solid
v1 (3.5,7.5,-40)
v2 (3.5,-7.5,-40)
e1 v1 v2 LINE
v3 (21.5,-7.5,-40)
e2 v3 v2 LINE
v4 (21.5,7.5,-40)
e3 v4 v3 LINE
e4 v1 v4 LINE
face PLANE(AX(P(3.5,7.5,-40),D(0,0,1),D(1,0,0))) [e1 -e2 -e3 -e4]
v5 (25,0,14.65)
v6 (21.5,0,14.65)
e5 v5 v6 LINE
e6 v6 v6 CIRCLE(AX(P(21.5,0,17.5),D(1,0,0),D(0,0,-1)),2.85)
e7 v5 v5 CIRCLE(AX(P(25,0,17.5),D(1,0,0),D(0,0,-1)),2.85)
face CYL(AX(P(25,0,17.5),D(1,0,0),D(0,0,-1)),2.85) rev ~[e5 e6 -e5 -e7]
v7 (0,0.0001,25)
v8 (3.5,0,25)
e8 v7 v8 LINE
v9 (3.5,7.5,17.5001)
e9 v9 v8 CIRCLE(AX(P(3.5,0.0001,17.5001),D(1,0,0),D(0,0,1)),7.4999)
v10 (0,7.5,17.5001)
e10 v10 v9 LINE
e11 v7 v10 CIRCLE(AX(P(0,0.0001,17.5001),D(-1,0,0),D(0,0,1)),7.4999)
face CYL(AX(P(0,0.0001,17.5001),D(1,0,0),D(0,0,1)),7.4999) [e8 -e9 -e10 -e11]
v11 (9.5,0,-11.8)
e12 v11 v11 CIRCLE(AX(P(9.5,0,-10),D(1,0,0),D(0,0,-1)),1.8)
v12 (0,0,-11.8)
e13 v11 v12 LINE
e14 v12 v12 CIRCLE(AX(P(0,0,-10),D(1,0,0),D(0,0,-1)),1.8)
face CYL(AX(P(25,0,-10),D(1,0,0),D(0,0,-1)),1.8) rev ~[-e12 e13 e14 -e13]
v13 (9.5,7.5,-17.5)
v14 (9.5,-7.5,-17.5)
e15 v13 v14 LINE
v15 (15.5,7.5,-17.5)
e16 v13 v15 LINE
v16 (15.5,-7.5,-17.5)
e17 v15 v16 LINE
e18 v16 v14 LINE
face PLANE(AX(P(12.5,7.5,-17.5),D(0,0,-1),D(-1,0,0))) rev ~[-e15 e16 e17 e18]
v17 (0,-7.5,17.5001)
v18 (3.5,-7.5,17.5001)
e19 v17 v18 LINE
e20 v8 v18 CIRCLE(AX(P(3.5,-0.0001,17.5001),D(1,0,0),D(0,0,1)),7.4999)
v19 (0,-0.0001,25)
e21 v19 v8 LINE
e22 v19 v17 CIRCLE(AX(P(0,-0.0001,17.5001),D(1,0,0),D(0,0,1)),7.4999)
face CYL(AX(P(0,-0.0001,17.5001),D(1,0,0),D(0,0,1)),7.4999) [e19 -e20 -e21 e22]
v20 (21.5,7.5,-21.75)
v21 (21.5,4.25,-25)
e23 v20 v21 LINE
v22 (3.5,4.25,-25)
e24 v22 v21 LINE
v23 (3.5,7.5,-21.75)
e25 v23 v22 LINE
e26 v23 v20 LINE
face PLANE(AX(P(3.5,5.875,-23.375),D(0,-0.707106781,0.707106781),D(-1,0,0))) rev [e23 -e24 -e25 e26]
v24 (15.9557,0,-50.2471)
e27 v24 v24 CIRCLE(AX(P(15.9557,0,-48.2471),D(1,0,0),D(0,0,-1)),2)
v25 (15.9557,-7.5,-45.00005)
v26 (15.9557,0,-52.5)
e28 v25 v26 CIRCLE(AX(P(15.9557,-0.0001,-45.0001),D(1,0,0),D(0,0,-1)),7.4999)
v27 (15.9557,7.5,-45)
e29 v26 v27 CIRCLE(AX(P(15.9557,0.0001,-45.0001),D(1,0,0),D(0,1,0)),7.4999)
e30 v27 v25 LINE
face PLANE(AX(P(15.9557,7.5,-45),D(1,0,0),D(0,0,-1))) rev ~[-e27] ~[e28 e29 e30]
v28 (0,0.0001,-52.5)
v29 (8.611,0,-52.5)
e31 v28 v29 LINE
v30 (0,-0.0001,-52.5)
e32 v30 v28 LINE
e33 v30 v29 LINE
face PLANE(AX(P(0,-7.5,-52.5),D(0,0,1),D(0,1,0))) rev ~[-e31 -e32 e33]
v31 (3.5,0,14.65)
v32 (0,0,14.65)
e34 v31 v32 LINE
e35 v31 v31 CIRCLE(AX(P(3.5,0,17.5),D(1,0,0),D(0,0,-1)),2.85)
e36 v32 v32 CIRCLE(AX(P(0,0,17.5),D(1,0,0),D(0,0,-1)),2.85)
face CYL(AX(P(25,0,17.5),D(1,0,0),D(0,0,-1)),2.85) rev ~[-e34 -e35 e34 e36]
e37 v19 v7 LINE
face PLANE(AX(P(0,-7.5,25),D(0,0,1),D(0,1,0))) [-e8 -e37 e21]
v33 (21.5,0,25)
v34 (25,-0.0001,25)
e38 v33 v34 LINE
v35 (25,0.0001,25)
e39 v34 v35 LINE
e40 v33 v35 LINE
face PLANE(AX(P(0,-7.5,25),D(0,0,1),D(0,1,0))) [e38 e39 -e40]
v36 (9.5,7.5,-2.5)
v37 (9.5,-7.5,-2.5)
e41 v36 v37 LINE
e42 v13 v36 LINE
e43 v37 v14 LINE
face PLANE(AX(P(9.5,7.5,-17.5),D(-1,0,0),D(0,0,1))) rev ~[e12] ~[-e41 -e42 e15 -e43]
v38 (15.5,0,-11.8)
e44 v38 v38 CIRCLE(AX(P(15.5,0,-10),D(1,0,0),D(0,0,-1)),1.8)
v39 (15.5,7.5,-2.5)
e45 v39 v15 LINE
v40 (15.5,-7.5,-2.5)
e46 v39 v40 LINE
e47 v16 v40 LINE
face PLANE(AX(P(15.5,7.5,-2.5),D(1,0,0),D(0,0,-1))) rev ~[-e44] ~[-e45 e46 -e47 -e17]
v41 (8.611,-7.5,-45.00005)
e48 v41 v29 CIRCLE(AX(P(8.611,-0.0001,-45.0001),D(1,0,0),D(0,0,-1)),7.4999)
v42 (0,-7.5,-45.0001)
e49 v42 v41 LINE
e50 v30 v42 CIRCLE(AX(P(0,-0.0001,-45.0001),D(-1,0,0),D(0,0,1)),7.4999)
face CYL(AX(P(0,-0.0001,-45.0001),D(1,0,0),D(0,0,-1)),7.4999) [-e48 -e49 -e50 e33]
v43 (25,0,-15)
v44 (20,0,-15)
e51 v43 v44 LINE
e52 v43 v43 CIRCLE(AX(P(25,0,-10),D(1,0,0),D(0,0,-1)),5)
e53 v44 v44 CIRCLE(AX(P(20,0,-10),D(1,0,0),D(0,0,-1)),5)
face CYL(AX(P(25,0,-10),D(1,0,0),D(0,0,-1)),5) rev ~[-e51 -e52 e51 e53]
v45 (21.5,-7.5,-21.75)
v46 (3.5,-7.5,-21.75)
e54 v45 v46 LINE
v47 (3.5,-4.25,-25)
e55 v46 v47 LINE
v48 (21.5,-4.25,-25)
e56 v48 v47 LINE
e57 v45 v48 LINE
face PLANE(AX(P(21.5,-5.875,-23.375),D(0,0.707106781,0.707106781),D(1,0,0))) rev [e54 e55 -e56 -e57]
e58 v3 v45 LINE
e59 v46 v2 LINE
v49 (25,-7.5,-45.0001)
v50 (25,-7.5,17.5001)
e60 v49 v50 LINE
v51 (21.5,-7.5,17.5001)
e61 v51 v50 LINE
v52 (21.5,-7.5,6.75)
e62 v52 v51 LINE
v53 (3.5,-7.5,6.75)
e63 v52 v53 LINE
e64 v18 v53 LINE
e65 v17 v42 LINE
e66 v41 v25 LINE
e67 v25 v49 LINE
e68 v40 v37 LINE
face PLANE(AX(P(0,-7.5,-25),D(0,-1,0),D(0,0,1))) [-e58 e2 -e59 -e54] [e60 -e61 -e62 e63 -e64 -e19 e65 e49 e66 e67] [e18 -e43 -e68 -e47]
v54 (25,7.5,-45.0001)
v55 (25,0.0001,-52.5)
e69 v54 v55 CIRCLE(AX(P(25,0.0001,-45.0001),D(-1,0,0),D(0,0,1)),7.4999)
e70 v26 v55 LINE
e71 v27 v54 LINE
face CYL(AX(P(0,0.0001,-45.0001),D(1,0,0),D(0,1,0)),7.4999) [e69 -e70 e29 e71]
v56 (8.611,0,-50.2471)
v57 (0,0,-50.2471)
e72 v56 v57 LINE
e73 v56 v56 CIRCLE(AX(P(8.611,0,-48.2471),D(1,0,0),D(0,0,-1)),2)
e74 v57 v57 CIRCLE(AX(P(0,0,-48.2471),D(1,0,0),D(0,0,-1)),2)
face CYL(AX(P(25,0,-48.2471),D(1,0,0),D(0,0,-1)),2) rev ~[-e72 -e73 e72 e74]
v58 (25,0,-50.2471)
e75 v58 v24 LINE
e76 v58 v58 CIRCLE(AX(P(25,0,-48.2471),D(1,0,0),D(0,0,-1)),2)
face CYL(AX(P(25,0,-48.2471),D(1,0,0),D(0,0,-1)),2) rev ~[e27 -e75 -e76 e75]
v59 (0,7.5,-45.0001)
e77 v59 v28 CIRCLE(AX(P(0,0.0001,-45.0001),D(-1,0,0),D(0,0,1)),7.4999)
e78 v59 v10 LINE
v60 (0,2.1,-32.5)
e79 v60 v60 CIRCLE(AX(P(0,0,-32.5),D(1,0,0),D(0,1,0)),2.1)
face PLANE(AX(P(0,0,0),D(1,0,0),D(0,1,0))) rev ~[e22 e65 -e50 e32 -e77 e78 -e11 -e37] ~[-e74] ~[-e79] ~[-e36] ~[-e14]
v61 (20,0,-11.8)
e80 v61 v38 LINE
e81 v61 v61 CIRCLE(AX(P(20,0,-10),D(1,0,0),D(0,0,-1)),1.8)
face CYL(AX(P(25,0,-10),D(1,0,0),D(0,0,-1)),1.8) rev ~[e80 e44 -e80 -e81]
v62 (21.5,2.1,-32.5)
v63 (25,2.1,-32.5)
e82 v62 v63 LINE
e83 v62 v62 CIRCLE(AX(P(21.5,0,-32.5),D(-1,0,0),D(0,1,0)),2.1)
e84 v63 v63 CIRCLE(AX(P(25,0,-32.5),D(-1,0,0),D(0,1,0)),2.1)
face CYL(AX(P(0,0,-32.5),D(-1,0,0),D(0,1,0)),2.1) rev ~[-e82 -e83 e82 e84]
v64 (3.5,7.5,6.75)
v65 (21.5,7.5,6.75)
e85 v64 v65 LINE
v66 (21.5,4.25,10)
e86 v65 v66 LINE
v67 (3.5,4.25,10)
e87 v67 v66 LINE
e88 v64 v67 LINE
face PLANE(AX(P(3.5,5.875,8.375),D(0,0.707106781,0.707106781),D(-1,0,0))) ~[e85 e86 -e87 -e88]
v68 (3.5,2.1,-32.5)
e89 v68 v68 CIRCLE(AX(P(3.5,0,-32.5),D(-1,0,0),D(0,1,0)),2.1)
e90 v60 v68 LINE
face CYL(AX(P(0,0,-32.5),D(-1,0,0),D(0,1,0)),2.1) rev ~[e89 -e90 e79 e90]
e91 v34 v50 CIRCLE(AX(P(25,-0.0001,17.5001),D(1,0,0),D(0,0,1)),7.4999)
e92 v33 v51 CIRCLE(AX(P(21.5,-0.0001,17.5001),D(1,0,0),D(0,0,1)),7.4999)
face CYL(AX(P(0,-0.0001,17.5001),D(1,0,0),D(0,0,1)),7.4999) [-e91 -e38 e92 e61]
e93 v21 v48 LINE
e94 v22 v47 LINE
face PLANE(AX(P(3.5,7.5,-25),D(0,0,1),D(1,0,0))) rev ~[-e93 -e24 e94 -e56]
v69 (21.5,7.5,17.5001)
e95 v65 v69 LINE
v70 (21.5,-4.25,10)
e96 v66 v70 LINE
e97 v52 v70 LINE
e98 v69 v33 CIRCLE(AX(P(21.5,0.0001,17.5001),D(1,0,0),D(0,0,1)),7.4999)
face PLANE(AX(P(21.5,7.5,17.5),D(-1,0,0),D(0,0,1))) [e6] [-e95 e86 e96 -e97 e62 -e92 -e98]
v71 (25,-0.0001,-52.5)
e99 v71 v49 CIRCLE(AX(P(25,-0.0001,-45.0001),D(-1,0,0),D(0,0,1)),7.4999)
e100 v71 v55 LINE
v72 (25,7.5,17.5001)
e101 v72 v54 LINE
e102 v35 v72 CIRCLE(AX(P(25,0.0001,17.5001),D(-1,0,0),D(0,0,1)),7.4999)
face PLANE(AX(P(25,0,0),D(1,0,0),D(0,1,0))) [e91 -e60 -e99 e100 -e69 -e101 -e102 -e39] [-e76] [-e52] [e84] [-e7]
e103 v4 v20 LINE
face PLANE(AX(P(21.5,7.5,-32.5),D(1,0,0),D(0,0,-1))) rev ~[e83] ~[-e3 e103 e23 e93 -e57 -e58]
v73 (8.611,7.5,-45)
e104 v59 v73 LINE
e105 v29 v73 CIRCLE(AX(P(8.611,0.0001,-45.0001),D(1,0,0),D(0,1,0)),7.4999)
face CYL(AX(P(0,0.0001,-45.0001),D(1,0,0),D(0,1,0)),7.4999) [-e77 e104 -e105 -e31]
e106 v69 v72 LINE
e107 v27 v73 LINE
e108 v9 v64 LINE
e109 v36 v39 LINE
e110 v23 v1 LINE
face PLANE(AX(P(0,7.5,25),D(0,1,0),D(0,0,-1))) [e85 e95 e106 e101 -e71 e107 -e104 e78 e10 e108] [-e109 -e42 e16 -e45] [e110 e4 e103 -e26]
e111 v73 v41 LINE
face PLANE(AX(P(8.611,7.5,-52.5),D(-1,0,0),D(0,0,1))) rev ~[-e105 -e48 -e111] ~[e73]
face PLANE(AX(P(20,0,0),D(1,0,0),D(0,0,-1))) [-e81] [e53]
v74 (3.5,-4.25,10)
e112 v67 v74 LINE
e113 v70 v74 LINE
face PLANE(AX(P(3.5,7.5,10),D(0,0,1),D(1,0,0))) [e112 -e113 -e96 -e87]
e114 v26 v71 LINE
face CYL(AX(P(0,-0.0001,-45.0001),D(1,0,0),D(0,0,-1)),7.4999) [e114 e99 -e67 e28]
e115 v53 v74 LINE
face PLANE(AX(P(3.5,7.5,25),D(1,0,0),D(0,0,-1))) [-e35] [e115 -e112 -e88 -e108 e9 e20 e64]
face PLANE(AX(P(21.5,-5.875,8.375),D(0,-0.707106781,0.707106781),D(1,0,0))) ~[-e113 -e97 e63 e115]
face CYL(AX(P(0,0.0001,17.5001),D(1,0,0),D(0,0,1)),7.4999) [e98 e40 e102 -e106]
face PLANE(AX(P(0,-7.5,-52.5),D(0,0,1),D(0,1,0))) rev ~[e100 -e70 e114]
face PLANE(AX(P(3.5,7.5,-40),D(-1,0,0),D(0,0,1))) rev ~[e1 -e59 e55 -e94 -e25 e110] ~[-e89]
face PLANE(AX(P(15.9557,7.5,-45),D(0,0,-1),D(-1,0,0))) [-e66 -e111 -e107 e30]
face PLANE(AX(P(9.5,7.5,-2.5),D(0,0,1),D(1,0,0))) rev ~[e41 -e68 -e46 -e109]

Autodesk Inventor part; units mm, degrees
ref_plane "YZ Plane" through (0, 0, 0) normal (1, 0, 0) x (0, 1, 0)
ref_plane "XZ Plane" through (0, 0, 0) normal (0, 1, 0) x (-1, 0, 0)
ref_plane "XY Plane" through (0, 0, 0) normal (0, 0, 1) x (1, 0, 0)
sketch "Эскиз1" plane through (0, 0, 0) normal (1, 0, 0) x (0, 1, 0)
  line L0 (-7.5, 25) -> (7.5, 25)
  line L1 (7.5, 25) -> (7.5, -25)
  line L2 (7.5, -25) -> (-7.5, -25)
  line L3 (-7.5, -25) -> (-7.5, 25)
  line L4 (-7.5, 25) -> (7.5, -25) construction
  line L5 (7.5, 25) -> (-7.5, -25) construction
  line L6 (0, -25) -> (0, -32.5)
  arc A0 (-7.5, -32.5) -> (7.5, -32.5) centre (0, -32.5) ccw
  line L7 (-7.5, -25) -> (-7.5, -32.5)
  line L8 (7.5, -25) -> (7.5, -32.5)
  circle A1 centre (0, -32.5) radius 2.1
  line L9 (-7.5, -32.5) -> (-7.5, -44.5)
  line L10 (-7.5, -44.5) -> (7.5, -44.5)
  line L11 (7.5, -44.5) -> (7.5, -32.5)
  line L12 (7.5, -32.5) -> (2.1, -32.5)
  line L13 (-2.1, -32.5) -> (-7.5, -32.5)
  line L14 (7.5, -44.5) -> (-7.5, -44.5)
  line L15 (-7.5, -44.5) -> (-7.5, -52.5)
  line L16 (-7.5, -52.5) -> (7.5, -52.5)
  line L17 (7.5, -52.5) -> (7.5, -44.5)
  point P0 (0, 0)
  dimension "d0" = 15
  dimension "d1" = 50
  dimension "d4" = 4.2
  dimension "d31" = 15
  dimension "d32" = 12
  dimension "d34" = 8
extrude "Выдавливание1" add sketch "Эскиз1" along normal blind 25 contours L0 L1 L2 L3 | L2 L6 A1 L13 L7 | L8 L12 A1 L6 L2 | L13 A1 L12 A0 | A0 L11 L10 L9 | L10 L17 L16 L15
sketch "Эскиз2" plane through (0, 7.5, 25) normal (0, 1, 0) x (1, 0, 0)
  line L0 (0, 65) -> (25, 65) projected
  line L1 (3.5, 50) -> (21.5, 50)
  line L2 (21.5, 50) -> (21.5, 65)
  line L3 (21.5, 65) -> (3.5, 65)
  line L4 (3.5, 65) -> (3.5, 50)
  line L5 (0, 57.5) -> (25, 57.5) projected
  line L6 (3.5, 50) -> (21.5, 65) construction
  line L7 (21.5, 50) -> (3.5, 65) construction
  point P0 (0, 25)
  point P1 (12.5, 57.5)
  dimension "d7" = 18
extrude "Выдавливание2" cut sketch "Эскиз2" against normal blind 25
sketch "Эскиз3" plane through (0, 7.5, 25) normal (0, 1, 0) x (1, 0, 0)
  line L0 (21.5, 50) -> (3.5, 50) projected
  line L1 (12.5, 50) -> (12.5, 35)
  line L2 (9.5, 27.5) -> (15.5, 27.5)
  line L3 (15.5, 27.5) -> (15.5, 42.5)
  line L4 (15.5, 42.5) -> (9.5, 42.5)
  line L5 (9.5, 42.5) -> (9.5, 27.5)
  line L6 (9.5, 27.5) -> (15.5, 42.5) construction
  line L7 (15.5, 27.5) -> (9.5, 42.5) construction
  point P0 (0, 25)
  dimension "d10" = 15
  dimension "d11" = 6
  dimension "d12" = 15
extrude "Выдавливание3" cut sketch "Эскиз3" against normal blind 25
sketch "Эскиз4" plane through (25, 0, 0) normal (1, 0, 0) x (0, 0, -1)
  line L0 (2.5, 7.5) -> (2.5, -7.5) projected
  line L1 (17.5, 7.5) -> (17.5, -7.5) projected
  line L2 (2.5, 7.5) -> (2.5, -7.5) projected
  line L3 (2.5, 0) -> (17.5, 0)
  circle A0 centre (10, 0) radius 1.8
  point P0 (0, 0)
  dimension "d15" = 3.6
extrude "Выдавливание4" cut sketch "Эскиз4" against normal blind 25
sketch "Эскиз5" plane through (25, 0, 0) normal (1, 0, 0) x (0, 0, -1)
  circle A0 centre (10, 0) radius 1.8 projected
  circle A1 centre (10, 0) radius 5
  point P0 (0, 0)
  dimension "d18" = 10
extrude "Выдавливание5" cut sketch "Эскиз5" against normal blind 5
fillet "Сопряжение1" radius 7.5 2 edges at (12.5, 7.5, 25) (12.5, -7.5, 25)
sketch "Эскиз6" plane through (25, 0, 0) normal (1, 0, 0) x (0, 0, -1)
  arc A0 (-17.5, 7.5) -> (-17.5, -7.5) centre (-17.5, 0) ccw projected
  circle A1 centre (-17.5, 0) radius 2.85
  point P0 (0, 0)
  dimension "d22" = 5.7
extrude "Выдавливание6" cut sketch "Эскиз6" against normal blind 25
sketch "Эскиз7" plane through (3.5, 7.5, -25) normal (0, 1, 0) x (1, 0, 0)
  line L0 (-3.5, -50) -> (21.5, -50) projected
  line L1 (0, -35) -> (18, -35)
  line L2 (18, -35) -> (18, -50)
  line L3 (18, -50) -> (0, -50)
  line L4 (0, -50) -> (0, -35)
  line L5 (-3.5, -42.5) -> (21.5, -42.5) projected
  line L6 (0, -35) -> (18, -50) construction
  line L7 (18, -35) -> (0, -50) construction
  point P0 (-3.5, -25)
  point P1 (9, -42.5)
  dimension "d25" = 18
extrude "Выдавливание7" cut sketch "Эскиз7" against normal blind 25
chamfer "Фаска1" distance 3.25 angle 45 4 edges at (12.5, 7.5, 10) (12.5, -7.5, 10) (12.5, 7.5, -25) (12.5, -7.5, -25)
fillet "Сопряжение3" radius 7.5 2 edges at (12.5, 7.5, -52.5) (12.5, -7.5, -52.5)
sketch "Эскиз8" plane through (25, 0, 0) normal (1, 0, 0) x (0, 0, -1)
  circle A0 centre (48.2471, 0) radius 2
  point P0 (0, 0)
  dimension "d36" = 4
extrude "Выдавливание8" cut sketch "Эскиз8" against normal blind 25
sketch "Эскиз9" plane through (0, 7.5, 17.5) normal (0, 1, 0) x (1, 0, 0)
  line L0 (25, 62.5) -> (0, 62.5) projected
  line L1 (0, 70) -> (25, 70) projected
  line L2 (8.611, 62.5) -> (15.9557, 62.5)
  line L3 (15.9557, 62.5) -> (15.9557, 70)
  line L4 (15.9557, 70) -> (8.611, 70)
  line L5 (8.611, 70) -> (8.611, 62.5)
  point P0 (0, 17.5)
extrude "Выдавливание9" cut sketch "Эскиз9" against normal blind 25
properties part number "КВ33.044.602 - Держатель катка"
